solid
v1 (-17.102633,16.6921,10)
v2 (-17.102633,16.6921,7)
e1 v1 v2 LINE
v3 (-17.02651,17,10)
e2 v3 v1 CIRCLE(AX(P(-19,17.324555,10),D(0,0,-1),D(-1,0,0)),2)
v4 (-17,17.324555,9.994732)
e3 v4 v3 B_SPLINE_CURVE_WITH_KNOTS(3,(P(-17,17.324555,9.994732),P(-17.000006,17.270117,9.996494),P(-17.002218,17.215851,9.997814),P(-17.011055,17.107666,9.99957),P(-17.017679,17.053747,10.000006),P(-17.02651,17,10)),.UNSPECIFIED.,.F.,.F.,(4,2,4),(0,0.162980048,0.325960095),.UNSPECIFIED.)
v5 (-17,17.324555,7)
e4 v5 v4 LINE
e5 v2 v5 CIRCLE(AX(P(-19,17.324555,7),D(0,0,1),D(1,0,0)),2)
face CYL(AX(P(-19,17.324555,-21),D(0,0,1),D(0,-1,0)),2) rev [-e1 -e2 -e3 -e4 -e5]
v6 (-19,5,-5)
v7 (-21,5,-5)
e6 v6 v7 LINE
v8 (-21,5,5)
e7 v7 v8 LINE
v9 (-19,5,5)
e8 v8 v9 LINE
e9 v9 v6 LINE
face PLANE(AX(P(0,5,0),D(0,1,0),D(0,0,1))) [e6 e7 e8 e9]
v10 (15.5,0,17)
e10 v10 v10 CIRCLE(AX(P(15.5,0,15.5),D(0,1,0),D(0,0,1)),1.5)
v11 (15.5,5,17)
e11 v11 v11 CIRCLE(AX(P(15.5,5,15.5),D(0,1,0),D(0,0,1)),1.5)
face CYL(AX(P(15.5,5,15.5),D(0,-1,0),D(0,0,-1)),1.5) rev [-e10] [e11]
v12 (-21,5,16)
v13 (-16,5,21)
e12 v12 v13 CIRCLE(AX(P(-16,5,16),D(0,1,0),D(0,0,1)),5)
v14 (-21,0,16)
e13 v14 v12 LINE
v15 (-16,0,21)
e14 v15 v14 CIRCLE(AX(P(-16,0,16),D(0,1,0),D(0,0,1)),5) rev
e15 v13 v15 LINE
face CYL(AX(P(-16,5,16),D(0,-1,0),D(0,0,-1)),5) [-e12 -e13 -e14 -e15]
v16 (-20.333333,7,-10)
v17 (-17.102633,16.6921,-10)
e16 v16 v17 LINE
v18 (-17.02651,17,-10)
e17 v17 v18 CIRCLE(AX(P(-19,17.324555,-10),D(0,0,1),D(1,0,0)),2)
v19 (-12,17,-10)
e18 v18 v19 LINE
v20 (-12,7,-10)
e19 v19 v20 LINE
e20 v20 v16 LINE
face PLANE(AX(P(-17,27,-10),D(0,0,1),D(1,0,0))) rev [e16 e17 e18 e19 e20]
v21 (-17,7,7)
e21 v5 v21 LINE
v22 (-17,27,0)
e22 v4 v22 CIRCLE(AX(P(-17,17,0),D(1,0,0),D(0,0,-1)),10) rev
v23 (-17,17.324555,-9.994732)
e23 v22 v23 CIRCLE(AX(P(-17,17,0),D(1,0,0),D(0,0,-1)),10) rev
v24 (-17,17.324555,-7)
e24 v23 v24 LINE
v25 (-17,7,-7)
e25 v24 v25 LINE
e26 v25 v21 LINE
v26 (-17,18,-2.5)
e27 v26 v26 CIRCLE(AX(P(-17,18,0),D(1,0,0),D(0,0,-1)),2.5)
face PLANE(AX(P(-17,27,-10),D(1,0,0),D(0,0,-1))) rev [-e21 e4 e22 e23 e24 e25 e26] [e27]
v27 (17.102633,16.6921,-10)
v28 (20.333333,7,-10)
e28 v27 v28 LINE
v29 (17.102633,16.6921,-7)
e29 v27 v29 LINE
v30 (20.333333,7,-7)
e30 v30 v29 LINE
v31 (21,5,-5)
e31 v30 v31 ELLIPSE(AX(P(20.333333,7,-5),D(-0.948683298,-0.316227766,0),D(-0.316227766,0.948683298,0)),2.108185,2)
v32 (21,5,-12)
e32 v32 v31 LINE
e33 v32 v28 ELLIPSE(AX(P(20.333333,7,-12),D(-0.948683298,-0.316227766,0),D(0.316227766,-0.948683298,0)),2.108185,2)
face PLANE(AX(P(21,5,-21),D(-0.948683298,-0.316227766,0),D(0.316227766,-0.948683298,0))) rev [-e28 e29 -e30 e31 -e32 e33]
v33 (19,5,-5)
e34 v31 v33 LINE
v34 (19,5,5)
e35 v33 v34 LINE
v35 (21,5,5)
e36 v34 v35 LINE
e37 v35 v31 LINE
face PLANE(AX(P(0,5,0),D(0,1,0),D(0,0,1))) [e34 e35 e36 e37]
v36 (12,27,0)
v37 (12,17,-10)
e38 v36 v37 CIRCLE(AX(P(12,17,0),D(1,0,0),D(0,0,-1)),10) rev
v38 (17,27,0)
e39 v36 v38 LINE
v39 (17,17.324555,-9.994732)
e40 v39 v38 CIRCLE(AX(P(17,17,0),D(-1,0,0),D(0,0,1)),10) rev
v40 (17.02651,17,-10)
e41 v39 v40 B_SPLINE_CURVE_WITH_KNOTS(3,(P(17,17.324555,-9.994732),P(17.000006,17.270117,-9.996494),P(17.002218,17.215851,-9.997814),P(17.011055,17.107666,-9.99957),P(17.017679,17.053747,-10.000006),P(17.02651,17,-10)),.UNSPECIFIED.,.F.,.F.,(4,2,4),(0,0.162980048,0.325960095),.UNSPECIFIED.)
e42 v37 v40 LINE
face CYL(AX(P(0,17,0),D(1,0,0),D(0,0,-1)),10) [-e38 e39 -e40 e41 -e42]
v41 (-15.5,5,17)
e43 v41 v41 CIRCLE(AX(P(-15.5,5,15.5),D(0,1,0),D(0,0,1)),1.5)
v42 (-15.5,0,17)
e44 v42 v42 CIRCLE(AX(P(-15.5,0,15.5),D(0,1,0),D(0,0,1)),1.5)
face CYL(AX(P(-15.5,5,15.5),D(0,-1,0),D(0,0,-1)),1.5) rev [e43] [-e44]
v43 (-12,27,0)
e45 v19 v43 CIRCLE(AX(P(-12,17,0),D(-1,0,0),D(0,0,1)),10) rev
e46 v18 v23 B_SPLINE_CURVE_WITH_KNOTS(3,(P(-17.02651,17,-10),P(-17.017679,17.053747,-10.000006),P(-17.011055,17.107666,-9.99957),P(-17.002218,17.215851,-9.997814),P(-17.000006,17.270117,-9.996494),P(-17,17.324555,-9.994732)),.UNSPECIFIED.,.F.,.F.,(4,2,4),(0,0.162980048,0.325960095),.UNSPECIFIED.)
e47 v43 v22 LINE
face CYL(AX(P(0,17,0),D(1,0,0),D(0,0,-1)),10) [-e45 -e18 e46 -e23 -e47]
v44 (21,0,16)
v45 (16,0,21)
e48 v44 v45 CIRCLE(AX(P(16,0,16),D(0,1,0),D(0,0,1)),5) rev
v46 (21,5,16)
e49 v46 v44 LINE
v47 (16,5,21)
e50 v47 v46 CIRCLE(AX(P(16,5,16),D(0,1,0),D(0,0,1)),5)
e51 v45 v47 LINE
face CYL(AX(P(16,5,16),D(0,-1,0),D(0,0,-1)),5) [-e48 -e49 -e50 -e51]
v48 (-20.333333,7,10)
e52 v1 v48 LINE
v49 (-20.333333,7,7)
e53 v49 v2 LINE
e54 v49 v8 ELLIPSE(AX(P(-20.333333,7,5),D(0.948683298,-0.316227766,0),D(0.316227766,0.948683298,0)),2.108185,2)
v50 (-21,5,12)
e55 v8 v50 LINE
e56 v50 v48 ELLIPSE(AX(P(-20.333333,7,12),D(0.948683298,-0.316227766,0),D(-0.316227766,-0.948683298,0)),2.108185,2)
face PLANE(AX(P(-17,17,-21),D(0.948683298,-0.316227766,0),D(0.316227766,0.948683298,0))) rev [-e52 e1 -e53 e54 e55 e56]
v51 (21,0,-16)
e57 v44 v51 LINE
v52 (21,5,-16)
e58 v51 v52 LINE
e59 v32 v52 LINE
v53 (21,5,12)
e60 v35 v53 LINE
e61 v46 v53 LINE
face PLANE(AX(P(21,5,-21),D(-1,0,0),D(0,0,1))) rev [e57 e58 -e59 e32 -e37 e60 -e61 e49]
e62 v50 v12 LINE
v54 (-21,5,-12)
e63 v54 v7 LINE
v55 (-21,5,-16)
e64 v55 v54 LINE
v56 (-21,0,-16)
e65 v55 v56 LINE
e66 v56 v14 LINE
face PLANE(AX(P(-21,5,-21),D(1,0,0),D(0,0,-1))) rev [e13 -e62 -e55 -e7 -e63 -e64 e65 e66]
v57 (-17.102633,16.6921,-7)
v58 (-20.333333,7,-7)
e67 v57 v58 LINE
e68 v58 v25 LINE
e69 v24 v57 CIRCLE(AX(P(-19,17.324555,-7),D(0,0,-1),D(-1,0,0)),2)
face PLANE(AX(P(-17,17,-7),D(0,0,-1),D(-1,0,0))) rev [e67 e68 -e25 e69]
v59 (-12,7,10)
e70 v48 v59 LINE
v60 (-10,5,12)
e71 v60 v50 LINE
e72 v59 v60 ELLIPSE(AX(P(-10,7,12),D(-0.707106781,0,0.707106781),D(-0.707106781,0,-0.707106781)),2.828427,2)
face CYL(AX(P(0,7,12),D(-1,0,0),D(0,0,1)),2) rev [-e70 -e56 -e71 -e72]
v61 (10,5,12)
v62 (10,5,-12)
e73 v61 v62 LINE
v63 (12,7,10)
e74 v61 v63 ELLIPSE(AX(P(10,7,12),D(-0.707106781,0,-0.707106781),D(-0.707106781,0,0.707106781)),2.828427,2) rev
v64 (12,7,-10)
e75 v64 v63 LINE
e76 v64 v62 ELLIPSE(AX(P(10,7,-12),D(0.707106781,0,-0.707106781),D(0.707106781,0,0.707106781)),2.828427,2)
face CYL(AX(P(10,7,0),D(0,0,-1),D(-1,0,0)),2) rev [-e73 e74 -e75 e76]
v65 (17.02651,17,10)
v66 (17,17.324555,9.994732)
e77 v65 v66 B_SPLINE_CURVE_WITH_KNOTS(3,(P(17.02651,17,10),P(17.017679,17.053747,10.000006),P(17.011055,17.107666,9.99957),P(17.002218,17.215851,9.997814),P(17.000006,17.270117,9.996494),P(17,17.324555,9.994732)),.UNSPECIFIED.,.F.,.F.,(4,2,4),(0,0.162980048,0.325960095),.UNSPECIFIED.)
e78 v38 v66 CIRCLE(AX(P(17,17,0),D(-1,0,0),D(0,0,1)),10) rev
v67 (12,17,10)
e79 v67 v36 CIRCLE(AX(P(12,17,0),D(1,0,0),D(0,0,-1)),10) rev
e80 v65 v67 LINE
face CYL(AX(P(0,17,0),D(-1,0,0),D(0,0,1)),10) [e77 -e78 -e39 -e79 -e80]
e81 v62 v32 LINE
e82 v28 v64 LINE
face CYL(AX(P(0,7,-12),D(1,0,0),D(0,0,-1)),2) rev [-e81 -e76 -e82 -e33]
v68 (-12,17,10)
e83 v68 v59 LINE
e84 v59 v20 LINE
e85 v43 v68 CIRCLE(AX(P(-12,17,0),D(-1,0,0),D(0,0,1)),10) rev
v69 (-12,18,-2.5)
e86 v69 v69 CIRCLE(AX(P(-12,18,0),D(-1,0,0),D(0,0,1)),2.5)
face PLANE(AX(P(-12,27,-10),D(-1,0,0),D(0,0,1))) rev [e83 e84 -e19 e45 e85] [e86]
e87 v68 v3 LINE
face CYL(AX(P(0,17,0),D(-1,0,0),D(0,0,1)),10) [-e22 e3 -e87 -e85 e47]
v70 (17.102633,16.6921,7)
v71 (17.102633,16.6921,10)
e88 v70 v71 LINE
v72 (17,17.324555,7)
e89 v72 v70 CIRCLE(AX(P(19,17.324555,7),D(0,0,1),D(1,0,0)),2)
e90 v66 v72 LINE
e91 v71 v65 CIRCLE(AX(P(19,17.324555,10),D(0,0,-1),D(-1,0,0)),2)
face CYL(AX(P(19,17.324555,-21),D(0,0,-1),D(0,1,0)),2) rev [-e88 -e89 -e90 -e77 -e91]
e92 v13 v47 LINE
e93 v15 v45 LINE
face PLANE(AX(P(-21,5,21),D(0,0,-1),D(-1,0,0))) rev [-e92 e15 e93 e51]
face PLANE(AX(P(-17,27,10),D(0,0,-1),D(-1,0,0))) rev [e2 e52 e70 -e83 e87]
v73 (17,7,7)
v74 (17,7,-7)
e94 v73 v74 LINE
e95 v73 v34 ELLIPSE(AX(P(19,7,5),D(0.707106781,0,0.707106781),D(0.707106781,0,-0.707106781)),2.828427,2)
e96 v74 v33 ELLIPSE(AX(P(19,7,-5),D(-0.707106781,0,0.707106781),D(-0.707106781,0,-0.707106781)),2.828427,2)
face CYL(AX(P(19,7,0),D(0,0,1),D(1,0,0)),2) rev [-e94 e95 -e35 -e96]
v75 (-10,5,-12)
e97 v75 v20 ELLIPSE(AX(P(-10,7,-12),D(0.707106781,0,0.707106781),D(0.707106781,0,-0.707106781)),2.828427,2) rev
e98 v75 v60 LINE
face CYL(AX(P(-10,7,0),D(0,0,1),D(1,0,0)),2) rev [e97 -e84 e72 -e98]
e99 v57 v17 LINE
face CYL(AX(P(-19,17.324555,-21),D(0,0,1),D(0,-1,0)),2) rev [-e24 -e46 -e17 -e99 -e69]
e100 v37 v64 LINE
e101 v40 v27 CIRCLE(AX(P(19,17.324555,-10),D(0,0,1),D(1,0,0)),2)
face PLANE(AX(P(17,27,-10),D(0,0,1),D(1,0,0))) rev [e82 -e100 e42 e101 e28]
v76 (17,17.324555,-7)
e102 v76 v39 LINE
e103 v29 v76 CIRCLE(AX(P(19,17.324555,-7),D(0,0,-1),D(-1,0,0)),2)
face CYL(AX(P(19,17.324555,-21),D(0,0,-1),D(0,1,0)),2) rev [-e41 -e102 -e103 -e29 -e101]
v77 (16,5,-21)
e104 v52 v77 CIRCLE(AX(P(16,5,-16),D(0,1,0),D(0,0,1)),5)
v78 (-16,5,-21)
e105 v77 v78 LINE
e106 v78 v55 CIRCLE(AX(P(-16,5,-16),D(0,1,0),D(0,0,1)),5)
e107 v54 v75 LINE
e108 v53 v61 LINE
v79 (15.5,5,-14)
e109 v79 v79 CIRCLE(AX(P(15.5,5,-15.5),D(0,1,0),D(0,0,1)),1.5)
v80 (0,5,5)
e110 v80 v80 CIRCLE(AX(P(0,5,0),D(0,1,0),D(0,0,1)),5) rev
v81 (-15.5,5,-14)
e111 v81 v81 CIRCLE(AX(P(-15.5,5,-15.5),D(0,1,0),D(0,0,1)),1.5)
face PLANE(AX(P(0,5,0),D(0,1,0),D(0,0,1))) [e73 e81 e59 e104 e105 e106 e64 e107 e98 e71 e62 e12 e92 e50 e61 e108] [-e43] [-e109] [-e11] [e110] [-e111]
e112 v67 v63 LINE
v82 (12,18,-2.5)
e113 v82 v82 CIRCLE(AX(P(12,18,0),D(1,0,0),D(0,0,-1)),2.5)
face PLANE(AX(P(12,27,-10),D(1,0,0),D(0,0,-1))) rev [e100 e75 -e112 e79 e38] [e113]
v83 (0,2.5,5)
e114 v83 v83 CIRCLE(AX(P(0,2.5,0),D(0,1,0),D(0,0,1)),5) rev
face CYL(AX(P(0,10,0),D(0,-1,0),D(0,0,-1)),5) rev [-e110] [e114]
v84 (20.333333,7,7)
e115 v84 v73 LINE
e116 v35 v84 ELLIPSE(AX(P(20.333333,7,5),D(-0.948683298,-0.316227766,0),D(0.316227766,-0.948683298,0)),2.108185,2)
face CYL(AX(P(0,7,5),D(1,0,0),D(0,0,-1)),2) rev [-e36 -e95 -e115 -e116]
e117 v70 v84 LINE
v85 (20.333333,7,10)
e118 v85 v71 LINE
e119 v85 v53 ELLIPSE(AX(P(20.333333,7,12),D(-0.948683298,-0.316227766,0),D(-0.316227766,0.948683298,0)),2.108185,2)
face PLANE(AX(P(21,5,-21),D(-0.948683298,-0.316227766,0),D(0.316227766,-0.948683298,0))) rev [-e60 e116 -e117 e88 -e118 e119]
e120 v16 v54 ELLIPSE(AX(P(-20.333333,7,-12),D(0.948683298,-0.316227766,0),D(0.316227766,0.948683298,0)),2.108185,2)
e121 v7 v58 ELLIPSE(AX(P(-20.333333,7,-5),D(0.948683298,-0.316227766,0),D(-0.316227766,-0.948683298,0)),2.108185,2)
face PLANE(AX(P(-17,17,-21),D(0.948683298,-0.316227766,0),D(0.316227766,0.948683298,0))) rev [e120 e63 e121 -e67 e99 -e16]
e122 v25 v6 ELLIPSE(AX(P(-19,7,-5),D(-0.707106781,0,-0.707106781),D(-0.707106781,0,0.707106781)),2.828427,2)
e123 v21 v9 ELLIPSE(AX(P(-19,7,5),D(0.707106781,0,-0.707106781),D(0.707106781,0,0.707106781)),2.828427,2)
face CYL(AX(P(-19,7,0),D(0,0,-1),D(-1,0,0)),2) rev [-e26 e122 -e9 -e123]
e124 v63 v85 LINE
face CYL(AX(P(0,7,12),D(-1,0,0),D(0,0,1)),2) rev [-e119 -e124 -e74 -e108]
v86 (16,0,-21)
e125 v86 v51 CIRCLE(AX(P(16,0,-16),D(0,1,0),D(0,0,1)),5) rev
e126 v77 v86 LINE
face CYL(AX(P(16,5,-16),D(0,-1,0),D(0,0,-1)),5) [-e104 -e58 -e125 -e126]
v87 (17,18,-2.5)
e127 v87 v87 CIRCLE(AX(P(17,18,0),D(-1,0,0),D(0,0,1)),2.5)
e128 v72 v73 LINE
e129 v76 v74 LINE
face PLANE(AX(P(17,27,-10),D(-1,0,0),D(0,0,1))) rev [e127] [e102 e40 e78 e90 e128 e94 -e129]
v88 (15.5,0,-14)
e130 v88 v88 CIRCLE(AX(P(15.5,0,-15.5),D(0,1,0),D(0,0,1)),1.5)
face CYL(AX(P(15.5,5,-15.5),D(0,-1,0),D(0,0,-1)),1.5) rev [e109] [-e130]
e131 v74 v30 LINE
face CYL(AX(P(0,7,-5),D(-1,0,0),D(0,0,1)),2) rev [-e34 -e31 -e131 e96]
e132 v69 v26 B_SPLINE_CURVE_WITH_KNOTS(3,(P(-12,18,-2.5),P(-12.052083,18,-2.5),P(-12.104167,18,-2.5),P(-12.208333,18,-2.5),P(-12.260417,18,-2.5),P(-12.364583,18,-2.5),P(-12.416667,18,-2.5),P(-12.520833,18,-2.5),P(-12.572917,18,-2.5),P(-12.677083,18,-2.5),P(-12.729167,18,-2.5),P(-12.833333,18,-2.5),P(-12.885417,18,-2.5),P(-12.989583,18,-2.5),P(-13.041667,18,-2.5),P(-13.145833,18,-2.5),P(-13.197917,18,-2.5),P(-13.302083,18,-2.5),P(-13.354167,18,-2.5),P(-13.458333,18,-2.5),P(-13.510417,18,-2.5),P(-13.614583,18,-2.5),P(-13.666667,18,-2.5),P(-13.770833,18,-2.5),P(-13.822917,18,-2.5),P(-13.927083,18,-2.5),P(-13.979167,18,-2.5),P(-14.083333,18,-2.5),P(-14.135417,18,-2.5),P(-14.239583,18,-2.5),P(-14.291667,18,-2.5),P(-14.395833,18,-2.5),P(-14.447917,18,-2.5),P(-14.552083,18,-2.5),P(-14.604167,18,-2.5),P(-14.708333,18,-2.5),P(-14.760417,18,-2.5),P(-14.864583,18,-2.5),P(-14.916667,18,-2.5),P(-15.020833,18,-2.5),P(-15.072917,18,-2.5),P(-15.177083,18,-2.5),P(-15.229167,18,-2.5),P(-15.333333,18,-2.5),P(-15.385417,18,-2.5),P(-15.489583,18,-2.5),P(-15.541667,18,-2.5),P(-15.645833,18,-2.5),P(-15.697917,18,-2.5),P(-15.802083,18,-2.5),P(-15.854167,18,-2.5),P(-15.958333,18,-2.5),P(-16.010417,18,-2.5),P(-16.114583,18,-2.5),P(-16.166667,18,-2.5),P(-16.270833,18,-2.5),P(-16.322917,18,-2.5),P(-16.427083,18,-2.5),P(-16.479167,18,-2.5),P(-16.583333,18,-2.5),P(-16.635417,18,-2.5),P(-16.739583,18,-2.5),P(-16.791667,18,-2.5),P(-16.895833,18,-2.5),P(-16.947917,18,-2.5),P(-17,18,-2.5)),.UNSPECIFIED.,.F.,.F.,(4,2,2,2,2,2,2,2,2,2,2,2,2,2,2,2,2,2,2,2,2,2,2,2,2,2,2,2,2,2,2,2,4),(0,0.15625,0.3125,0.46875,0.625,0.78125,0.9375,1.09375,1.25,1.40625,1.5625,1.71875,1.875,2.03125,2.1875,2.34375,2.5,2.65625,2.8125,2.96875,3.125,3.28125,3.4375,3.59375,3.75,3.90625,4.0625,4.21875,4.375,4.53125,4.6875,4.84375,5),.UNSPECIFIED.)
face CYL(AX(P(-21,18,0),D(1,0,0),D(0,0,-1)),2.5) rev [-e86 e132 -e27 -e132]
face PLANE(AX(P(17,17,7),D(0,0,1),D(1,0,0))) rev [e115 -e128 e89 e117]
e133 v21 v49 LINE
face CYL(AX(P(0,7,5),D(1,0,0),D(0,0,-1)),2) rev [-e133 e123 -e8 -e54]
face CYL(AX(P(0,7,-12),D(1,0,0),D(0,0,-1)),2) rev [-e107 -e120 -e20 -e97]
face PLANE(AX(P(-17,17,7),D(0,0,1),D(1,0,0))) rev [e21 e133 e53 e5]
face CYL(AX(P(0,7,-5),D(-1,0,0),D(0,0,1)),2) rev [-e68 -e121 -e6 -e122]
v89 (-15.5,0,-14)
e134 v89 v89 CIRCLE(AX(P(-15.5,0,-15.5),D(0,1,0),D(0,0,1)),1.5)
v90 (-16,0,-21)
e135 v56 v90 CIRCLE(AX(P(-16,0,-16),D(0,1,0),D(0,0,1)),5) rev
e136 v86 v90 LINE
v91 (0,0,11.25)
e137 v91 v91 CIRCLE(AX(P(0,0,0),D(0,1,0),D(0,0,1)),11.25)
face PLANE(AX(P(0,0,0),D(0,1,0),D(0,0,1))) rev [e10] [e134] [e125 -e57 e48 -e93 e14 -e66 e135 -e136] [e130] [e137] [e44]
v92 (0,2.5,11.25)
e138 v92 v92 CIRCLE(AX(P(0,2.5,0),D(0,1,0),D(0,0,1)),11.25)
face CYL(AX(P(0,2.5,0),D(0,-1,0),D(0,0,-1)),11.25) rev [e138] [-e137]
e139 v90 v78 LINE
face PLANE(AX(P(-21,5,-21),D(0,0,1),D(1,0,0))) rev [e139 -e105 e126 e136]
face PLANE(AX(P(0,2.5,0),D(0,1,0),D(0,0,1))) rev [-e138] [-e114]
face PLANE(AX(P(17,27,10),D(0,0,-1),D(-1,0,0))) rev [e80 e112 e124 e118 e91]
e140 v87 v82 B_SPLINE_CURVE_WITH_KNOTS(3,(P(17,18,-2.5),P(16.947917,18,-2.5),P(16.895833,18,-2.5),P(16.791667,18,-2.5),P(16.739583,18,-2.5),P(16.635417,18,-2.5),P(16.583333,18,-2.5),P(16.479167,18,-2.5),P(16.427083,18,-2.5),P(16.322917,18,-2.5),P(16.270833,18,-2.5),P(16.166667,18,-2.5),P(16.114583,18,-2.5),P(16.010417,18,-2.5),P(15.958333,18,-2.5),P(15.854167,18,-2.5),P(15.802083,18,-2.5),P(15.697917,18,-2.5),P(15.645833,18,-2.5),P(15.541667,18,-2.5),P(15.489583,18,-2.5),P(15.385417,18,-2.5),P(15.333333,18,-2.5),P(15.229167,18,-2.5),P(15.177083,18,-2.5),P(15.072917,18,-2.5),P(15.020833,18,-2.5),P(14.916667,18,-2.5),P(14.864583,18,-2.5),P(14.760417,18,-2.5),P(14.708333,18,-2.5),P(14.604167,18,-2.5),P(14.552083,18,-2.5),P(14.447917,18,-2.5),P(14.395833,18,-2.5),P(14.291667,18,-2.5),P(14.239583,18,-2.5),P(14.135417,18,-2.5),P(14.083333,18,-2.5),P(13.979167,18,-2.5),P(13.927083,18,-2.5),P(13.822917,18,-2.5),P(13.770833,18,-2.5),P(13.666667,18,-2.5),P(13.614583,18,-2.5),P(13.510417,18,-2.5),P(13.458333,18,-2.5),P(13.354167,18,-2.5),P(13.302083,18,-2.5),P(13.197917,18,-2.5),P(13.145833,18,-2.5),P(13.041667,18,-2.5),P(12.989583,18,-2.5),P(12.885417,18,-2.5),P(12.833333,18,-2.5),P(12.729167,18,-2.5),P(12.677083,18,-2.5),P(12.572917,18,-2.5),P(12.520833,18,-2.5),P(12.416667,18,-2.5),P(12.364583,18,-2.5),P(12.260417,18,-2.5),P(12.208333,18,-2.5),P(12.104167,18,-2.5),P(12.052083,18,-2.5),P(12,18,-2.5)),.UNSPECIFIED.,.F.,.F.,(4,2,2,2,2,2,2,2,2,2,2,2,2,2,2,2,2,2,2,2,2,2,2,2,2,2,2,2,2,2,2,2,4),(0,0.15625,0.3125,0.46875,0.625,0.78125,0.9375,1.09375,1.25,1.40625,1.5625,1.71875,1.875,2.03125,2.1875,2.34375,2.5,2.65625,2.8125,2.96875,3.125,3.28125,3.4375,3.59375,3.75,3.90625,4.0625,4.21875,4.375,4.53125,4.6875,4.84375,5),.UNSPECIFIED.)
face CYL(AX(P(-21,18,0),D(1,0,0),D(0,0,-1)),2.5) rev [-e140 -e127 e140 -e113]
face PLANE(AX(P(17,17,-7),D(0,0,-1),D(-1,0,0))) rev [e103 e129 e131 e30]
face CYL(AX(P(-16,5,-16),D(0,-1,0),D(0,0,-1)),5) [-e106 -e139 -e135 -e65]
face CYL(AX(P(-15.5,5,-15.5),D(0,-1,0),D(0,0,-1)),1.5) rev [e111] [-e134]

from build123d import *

# Parameters (mm, degrees)
SKETCH1_W               = 42
SKETCH1_H               = 42
SKETCH1_R               = 1.5
BOSS_EXTRUDE1_DEPTH     = 5
SKETCH2_W               = 5
SKETCH2_H               = 20
BOSS_EXTRUDE2_DEPTH     = 27
CUT_EXTRUDE1_DEPTH      = 41.137264481
CUT_EXTRUDE1_DEPTH_BACK = 41.137264481
SKETCH3_R               = 2.5
FILLET1_R               = 10
FILLET2_R               = 5
SKETCH4_R               = 11.25
CUT_EXTRUDE2_DEPTH      = 2.5
SKETCH5_R               = 5
CUT_EXTRUDE3_DEPTH      = 10
SKETCH6_W               = 4
SKETCH6_H               = 3
BOSS_EXTRUDE3_DEPTH     = 17
CUT_EXTRUDE4_DEPTH      = 41.137264481
CUT_EXTRUDE4_DEPTH_BACK = 41.137264481
FILLET3_R               = 2


with BuildPart() as part:
    # Sketch1 → Boss-Extrude1 (new body)
    with BuildSketch(Plane(origin=(0, 0, 0), x_dir=(1, 0, 0), z_dir=(0, 1, 0))):
        Rectangle(SKETCH1_W, SKETCH1_H)
        with Locations(Location((-15.5, 15.5, 0), (0, 0, 270))):
            Circle(SKETCH1_R, mode=Mode.SUBTRACT)
        with Locations(Location((15.5, 15.5, 0), (0, 0, 270))):
            Circle(SKETCH1_R, mode=Mode.SUBTRACT)
        with Locations(Location((15.5, -15.5, 0), (0, 0, 270))):
            Circle(SKETCH1_R, mode=Mode.SUBTRACT)
        with Locations(Location((-15.5, -15.5, 0), (0, 0, 270))):
            Circle(SKETCH1_R, mode=Mode.SUBTRACT)
    extrude(amount=BOSS_EXTRUDE1_DEPTH)

    # Sketch2 → Boss-Extrude2 (add)
    with BuildSketch(Plane(origin=(0, 0, 0), x_dir=(1, 0, 0), z_dir=(0, 1, 0))):
        with Locations((-14.5, 0)):
            Rectangle(SKETCH2_W, SKETCH2_H)
        with Locations((14.5, 0)):
            Rectangle(SKETCH2_W, SKETCH2_H)
    extrude(amount=BOSS_EXTRUDE2_DEPTH)

    # Sketch3 → Cut-Extrude1 (cut, two sides: drawn at the far end of the back side and taken through both)
    with BuildSketch(Plane(origin=(0, 0, 0), x_dir=(0, 0, -1), z_dir=(1, 0, 0)).offset(-CUT_EXTRUDE1_DEPTH_BACK)):
        with Locations((0, 18)):
            Circle(SKETCH3_R)
    extrude(amount=CUT_EXTRUDE1_DEPTH + CUT_EXTRUDE1_DEPTH_BACK, mode=Mode.SUBTRACT)

    # Fillet1
    fillet1_edges = [part.edges().sort_by_distance(p)[0] for p in [
        (-14.5, 27, 10),
        (-14.5, 27, -10),
        (14.5, 27, -10),
        (14.5, 27, 10),
    ]]
    fillet(fillet1_edges, radius=FILLET1_R - 0.0001)  # a hair under: the kernel refuses the full size

    # Fillet2
    fillet2_edges = [part.edges().sort_by_distance(p)[0] for p in [
        (21, 2.5, 21),
        (-21, 2.5, 21),
        (-21, 2.5, -21),
        (21, 2.5, -21),
    ]]
    fillet(fillet2_edges, radius=FILLET2_R)

    # Sketch4 → Cut-Extrude2 (cut)
    with BuildSketch(Plane(origin=(0, 0, 0), x_dir=(1, 0, 0), z_dir=(0, 1, 0))):
        with Locations(Location((0, 0, 0), (0, 0, 270))):
            Circle(SKETCH4_R)
    extrude(amount=CUT_EXTRUDE2_DEPTH, mode=Mode.SUBTRACT)

    # Sketch5 → Cut-Extrude3 (cut)
    with BuildSketch(Plane(origin=(0, 0, 0), x_dir=(1, 0, 0), z_dir=(0, 1, 0))):
        with Locations(Location((0, 0, 0), (0, 0, 270))):
            Circle(SKETCH5_R)
    extrude(amount=CUT_EXTRUDE3_DEPTH, mode=Mode.SUBTRACT)

    # Sketch6 → Boss-Extrude3 (add)
    with BuildSketch(Plane(origin=(0, 0, 0), x_dir=(1, 0, 0), z_dir=(0, 1, 0))):
        with Locations((-19, 8.5)):
            Rectangle(SKETCH6_W, SKETCH6_H)
        with Locations((-19, -8.5)):
            Rectangle(SKETCH6_W, SKETCH6_H)
        with Locations((19, -8.5)):
            Rectangle(SKETCH6_W, SKETCH6_H)
        with Locations((19, 8.5)):
            Rectangle(SKETCH6_W, SKETCH6_H)
    extrude(amount=BOSS_EXTRUDE3_DEPTH)

    # Sketch7 → Cut-Extrude4 (cut, two sides: drawn at the far end of the back side and taken through both)
    with BuildSketch(Plane.XY.offset(-CUT_EXTRUDE4_DEPTH_BACK)):
        Polygon((-17, 17), (-21, 5), (-21, 17), align=None)
        Polygon((17, 17), (21, 17), (21, 5), align=None)
    extrude(amount=CUT_EXTRUDE4_DEPTH + CUT_EXTRUDE4_DEPTH_BACK, mode=Mode.SUBTRACT)

    # Fillet3
    fillet3_edges = [part.edges().sort_by_distance(p)[0] for p in [
        (-19, 5, -7),
        (-17, 17, -8.5),
        (-17, 5, 0),
        (-19, 5, 7),
        (-17, 17, 8.5),
        (19, 5, 7),
        (17, 17, 8.5),
        (17, 5, 0),
        (19, 5, -7),
        (17, 17, -8.5),
        (-16.5, 5, 10),
        (-12, 5, 0),
        (-16.5, 5, -10),
        (16.5, 5, -10),
        (12, 5, 0),
        (16.5, 5, 10),
    ]]
    fillet(fillet3_edges, radius=FILLET3_R)


solid = part.part
